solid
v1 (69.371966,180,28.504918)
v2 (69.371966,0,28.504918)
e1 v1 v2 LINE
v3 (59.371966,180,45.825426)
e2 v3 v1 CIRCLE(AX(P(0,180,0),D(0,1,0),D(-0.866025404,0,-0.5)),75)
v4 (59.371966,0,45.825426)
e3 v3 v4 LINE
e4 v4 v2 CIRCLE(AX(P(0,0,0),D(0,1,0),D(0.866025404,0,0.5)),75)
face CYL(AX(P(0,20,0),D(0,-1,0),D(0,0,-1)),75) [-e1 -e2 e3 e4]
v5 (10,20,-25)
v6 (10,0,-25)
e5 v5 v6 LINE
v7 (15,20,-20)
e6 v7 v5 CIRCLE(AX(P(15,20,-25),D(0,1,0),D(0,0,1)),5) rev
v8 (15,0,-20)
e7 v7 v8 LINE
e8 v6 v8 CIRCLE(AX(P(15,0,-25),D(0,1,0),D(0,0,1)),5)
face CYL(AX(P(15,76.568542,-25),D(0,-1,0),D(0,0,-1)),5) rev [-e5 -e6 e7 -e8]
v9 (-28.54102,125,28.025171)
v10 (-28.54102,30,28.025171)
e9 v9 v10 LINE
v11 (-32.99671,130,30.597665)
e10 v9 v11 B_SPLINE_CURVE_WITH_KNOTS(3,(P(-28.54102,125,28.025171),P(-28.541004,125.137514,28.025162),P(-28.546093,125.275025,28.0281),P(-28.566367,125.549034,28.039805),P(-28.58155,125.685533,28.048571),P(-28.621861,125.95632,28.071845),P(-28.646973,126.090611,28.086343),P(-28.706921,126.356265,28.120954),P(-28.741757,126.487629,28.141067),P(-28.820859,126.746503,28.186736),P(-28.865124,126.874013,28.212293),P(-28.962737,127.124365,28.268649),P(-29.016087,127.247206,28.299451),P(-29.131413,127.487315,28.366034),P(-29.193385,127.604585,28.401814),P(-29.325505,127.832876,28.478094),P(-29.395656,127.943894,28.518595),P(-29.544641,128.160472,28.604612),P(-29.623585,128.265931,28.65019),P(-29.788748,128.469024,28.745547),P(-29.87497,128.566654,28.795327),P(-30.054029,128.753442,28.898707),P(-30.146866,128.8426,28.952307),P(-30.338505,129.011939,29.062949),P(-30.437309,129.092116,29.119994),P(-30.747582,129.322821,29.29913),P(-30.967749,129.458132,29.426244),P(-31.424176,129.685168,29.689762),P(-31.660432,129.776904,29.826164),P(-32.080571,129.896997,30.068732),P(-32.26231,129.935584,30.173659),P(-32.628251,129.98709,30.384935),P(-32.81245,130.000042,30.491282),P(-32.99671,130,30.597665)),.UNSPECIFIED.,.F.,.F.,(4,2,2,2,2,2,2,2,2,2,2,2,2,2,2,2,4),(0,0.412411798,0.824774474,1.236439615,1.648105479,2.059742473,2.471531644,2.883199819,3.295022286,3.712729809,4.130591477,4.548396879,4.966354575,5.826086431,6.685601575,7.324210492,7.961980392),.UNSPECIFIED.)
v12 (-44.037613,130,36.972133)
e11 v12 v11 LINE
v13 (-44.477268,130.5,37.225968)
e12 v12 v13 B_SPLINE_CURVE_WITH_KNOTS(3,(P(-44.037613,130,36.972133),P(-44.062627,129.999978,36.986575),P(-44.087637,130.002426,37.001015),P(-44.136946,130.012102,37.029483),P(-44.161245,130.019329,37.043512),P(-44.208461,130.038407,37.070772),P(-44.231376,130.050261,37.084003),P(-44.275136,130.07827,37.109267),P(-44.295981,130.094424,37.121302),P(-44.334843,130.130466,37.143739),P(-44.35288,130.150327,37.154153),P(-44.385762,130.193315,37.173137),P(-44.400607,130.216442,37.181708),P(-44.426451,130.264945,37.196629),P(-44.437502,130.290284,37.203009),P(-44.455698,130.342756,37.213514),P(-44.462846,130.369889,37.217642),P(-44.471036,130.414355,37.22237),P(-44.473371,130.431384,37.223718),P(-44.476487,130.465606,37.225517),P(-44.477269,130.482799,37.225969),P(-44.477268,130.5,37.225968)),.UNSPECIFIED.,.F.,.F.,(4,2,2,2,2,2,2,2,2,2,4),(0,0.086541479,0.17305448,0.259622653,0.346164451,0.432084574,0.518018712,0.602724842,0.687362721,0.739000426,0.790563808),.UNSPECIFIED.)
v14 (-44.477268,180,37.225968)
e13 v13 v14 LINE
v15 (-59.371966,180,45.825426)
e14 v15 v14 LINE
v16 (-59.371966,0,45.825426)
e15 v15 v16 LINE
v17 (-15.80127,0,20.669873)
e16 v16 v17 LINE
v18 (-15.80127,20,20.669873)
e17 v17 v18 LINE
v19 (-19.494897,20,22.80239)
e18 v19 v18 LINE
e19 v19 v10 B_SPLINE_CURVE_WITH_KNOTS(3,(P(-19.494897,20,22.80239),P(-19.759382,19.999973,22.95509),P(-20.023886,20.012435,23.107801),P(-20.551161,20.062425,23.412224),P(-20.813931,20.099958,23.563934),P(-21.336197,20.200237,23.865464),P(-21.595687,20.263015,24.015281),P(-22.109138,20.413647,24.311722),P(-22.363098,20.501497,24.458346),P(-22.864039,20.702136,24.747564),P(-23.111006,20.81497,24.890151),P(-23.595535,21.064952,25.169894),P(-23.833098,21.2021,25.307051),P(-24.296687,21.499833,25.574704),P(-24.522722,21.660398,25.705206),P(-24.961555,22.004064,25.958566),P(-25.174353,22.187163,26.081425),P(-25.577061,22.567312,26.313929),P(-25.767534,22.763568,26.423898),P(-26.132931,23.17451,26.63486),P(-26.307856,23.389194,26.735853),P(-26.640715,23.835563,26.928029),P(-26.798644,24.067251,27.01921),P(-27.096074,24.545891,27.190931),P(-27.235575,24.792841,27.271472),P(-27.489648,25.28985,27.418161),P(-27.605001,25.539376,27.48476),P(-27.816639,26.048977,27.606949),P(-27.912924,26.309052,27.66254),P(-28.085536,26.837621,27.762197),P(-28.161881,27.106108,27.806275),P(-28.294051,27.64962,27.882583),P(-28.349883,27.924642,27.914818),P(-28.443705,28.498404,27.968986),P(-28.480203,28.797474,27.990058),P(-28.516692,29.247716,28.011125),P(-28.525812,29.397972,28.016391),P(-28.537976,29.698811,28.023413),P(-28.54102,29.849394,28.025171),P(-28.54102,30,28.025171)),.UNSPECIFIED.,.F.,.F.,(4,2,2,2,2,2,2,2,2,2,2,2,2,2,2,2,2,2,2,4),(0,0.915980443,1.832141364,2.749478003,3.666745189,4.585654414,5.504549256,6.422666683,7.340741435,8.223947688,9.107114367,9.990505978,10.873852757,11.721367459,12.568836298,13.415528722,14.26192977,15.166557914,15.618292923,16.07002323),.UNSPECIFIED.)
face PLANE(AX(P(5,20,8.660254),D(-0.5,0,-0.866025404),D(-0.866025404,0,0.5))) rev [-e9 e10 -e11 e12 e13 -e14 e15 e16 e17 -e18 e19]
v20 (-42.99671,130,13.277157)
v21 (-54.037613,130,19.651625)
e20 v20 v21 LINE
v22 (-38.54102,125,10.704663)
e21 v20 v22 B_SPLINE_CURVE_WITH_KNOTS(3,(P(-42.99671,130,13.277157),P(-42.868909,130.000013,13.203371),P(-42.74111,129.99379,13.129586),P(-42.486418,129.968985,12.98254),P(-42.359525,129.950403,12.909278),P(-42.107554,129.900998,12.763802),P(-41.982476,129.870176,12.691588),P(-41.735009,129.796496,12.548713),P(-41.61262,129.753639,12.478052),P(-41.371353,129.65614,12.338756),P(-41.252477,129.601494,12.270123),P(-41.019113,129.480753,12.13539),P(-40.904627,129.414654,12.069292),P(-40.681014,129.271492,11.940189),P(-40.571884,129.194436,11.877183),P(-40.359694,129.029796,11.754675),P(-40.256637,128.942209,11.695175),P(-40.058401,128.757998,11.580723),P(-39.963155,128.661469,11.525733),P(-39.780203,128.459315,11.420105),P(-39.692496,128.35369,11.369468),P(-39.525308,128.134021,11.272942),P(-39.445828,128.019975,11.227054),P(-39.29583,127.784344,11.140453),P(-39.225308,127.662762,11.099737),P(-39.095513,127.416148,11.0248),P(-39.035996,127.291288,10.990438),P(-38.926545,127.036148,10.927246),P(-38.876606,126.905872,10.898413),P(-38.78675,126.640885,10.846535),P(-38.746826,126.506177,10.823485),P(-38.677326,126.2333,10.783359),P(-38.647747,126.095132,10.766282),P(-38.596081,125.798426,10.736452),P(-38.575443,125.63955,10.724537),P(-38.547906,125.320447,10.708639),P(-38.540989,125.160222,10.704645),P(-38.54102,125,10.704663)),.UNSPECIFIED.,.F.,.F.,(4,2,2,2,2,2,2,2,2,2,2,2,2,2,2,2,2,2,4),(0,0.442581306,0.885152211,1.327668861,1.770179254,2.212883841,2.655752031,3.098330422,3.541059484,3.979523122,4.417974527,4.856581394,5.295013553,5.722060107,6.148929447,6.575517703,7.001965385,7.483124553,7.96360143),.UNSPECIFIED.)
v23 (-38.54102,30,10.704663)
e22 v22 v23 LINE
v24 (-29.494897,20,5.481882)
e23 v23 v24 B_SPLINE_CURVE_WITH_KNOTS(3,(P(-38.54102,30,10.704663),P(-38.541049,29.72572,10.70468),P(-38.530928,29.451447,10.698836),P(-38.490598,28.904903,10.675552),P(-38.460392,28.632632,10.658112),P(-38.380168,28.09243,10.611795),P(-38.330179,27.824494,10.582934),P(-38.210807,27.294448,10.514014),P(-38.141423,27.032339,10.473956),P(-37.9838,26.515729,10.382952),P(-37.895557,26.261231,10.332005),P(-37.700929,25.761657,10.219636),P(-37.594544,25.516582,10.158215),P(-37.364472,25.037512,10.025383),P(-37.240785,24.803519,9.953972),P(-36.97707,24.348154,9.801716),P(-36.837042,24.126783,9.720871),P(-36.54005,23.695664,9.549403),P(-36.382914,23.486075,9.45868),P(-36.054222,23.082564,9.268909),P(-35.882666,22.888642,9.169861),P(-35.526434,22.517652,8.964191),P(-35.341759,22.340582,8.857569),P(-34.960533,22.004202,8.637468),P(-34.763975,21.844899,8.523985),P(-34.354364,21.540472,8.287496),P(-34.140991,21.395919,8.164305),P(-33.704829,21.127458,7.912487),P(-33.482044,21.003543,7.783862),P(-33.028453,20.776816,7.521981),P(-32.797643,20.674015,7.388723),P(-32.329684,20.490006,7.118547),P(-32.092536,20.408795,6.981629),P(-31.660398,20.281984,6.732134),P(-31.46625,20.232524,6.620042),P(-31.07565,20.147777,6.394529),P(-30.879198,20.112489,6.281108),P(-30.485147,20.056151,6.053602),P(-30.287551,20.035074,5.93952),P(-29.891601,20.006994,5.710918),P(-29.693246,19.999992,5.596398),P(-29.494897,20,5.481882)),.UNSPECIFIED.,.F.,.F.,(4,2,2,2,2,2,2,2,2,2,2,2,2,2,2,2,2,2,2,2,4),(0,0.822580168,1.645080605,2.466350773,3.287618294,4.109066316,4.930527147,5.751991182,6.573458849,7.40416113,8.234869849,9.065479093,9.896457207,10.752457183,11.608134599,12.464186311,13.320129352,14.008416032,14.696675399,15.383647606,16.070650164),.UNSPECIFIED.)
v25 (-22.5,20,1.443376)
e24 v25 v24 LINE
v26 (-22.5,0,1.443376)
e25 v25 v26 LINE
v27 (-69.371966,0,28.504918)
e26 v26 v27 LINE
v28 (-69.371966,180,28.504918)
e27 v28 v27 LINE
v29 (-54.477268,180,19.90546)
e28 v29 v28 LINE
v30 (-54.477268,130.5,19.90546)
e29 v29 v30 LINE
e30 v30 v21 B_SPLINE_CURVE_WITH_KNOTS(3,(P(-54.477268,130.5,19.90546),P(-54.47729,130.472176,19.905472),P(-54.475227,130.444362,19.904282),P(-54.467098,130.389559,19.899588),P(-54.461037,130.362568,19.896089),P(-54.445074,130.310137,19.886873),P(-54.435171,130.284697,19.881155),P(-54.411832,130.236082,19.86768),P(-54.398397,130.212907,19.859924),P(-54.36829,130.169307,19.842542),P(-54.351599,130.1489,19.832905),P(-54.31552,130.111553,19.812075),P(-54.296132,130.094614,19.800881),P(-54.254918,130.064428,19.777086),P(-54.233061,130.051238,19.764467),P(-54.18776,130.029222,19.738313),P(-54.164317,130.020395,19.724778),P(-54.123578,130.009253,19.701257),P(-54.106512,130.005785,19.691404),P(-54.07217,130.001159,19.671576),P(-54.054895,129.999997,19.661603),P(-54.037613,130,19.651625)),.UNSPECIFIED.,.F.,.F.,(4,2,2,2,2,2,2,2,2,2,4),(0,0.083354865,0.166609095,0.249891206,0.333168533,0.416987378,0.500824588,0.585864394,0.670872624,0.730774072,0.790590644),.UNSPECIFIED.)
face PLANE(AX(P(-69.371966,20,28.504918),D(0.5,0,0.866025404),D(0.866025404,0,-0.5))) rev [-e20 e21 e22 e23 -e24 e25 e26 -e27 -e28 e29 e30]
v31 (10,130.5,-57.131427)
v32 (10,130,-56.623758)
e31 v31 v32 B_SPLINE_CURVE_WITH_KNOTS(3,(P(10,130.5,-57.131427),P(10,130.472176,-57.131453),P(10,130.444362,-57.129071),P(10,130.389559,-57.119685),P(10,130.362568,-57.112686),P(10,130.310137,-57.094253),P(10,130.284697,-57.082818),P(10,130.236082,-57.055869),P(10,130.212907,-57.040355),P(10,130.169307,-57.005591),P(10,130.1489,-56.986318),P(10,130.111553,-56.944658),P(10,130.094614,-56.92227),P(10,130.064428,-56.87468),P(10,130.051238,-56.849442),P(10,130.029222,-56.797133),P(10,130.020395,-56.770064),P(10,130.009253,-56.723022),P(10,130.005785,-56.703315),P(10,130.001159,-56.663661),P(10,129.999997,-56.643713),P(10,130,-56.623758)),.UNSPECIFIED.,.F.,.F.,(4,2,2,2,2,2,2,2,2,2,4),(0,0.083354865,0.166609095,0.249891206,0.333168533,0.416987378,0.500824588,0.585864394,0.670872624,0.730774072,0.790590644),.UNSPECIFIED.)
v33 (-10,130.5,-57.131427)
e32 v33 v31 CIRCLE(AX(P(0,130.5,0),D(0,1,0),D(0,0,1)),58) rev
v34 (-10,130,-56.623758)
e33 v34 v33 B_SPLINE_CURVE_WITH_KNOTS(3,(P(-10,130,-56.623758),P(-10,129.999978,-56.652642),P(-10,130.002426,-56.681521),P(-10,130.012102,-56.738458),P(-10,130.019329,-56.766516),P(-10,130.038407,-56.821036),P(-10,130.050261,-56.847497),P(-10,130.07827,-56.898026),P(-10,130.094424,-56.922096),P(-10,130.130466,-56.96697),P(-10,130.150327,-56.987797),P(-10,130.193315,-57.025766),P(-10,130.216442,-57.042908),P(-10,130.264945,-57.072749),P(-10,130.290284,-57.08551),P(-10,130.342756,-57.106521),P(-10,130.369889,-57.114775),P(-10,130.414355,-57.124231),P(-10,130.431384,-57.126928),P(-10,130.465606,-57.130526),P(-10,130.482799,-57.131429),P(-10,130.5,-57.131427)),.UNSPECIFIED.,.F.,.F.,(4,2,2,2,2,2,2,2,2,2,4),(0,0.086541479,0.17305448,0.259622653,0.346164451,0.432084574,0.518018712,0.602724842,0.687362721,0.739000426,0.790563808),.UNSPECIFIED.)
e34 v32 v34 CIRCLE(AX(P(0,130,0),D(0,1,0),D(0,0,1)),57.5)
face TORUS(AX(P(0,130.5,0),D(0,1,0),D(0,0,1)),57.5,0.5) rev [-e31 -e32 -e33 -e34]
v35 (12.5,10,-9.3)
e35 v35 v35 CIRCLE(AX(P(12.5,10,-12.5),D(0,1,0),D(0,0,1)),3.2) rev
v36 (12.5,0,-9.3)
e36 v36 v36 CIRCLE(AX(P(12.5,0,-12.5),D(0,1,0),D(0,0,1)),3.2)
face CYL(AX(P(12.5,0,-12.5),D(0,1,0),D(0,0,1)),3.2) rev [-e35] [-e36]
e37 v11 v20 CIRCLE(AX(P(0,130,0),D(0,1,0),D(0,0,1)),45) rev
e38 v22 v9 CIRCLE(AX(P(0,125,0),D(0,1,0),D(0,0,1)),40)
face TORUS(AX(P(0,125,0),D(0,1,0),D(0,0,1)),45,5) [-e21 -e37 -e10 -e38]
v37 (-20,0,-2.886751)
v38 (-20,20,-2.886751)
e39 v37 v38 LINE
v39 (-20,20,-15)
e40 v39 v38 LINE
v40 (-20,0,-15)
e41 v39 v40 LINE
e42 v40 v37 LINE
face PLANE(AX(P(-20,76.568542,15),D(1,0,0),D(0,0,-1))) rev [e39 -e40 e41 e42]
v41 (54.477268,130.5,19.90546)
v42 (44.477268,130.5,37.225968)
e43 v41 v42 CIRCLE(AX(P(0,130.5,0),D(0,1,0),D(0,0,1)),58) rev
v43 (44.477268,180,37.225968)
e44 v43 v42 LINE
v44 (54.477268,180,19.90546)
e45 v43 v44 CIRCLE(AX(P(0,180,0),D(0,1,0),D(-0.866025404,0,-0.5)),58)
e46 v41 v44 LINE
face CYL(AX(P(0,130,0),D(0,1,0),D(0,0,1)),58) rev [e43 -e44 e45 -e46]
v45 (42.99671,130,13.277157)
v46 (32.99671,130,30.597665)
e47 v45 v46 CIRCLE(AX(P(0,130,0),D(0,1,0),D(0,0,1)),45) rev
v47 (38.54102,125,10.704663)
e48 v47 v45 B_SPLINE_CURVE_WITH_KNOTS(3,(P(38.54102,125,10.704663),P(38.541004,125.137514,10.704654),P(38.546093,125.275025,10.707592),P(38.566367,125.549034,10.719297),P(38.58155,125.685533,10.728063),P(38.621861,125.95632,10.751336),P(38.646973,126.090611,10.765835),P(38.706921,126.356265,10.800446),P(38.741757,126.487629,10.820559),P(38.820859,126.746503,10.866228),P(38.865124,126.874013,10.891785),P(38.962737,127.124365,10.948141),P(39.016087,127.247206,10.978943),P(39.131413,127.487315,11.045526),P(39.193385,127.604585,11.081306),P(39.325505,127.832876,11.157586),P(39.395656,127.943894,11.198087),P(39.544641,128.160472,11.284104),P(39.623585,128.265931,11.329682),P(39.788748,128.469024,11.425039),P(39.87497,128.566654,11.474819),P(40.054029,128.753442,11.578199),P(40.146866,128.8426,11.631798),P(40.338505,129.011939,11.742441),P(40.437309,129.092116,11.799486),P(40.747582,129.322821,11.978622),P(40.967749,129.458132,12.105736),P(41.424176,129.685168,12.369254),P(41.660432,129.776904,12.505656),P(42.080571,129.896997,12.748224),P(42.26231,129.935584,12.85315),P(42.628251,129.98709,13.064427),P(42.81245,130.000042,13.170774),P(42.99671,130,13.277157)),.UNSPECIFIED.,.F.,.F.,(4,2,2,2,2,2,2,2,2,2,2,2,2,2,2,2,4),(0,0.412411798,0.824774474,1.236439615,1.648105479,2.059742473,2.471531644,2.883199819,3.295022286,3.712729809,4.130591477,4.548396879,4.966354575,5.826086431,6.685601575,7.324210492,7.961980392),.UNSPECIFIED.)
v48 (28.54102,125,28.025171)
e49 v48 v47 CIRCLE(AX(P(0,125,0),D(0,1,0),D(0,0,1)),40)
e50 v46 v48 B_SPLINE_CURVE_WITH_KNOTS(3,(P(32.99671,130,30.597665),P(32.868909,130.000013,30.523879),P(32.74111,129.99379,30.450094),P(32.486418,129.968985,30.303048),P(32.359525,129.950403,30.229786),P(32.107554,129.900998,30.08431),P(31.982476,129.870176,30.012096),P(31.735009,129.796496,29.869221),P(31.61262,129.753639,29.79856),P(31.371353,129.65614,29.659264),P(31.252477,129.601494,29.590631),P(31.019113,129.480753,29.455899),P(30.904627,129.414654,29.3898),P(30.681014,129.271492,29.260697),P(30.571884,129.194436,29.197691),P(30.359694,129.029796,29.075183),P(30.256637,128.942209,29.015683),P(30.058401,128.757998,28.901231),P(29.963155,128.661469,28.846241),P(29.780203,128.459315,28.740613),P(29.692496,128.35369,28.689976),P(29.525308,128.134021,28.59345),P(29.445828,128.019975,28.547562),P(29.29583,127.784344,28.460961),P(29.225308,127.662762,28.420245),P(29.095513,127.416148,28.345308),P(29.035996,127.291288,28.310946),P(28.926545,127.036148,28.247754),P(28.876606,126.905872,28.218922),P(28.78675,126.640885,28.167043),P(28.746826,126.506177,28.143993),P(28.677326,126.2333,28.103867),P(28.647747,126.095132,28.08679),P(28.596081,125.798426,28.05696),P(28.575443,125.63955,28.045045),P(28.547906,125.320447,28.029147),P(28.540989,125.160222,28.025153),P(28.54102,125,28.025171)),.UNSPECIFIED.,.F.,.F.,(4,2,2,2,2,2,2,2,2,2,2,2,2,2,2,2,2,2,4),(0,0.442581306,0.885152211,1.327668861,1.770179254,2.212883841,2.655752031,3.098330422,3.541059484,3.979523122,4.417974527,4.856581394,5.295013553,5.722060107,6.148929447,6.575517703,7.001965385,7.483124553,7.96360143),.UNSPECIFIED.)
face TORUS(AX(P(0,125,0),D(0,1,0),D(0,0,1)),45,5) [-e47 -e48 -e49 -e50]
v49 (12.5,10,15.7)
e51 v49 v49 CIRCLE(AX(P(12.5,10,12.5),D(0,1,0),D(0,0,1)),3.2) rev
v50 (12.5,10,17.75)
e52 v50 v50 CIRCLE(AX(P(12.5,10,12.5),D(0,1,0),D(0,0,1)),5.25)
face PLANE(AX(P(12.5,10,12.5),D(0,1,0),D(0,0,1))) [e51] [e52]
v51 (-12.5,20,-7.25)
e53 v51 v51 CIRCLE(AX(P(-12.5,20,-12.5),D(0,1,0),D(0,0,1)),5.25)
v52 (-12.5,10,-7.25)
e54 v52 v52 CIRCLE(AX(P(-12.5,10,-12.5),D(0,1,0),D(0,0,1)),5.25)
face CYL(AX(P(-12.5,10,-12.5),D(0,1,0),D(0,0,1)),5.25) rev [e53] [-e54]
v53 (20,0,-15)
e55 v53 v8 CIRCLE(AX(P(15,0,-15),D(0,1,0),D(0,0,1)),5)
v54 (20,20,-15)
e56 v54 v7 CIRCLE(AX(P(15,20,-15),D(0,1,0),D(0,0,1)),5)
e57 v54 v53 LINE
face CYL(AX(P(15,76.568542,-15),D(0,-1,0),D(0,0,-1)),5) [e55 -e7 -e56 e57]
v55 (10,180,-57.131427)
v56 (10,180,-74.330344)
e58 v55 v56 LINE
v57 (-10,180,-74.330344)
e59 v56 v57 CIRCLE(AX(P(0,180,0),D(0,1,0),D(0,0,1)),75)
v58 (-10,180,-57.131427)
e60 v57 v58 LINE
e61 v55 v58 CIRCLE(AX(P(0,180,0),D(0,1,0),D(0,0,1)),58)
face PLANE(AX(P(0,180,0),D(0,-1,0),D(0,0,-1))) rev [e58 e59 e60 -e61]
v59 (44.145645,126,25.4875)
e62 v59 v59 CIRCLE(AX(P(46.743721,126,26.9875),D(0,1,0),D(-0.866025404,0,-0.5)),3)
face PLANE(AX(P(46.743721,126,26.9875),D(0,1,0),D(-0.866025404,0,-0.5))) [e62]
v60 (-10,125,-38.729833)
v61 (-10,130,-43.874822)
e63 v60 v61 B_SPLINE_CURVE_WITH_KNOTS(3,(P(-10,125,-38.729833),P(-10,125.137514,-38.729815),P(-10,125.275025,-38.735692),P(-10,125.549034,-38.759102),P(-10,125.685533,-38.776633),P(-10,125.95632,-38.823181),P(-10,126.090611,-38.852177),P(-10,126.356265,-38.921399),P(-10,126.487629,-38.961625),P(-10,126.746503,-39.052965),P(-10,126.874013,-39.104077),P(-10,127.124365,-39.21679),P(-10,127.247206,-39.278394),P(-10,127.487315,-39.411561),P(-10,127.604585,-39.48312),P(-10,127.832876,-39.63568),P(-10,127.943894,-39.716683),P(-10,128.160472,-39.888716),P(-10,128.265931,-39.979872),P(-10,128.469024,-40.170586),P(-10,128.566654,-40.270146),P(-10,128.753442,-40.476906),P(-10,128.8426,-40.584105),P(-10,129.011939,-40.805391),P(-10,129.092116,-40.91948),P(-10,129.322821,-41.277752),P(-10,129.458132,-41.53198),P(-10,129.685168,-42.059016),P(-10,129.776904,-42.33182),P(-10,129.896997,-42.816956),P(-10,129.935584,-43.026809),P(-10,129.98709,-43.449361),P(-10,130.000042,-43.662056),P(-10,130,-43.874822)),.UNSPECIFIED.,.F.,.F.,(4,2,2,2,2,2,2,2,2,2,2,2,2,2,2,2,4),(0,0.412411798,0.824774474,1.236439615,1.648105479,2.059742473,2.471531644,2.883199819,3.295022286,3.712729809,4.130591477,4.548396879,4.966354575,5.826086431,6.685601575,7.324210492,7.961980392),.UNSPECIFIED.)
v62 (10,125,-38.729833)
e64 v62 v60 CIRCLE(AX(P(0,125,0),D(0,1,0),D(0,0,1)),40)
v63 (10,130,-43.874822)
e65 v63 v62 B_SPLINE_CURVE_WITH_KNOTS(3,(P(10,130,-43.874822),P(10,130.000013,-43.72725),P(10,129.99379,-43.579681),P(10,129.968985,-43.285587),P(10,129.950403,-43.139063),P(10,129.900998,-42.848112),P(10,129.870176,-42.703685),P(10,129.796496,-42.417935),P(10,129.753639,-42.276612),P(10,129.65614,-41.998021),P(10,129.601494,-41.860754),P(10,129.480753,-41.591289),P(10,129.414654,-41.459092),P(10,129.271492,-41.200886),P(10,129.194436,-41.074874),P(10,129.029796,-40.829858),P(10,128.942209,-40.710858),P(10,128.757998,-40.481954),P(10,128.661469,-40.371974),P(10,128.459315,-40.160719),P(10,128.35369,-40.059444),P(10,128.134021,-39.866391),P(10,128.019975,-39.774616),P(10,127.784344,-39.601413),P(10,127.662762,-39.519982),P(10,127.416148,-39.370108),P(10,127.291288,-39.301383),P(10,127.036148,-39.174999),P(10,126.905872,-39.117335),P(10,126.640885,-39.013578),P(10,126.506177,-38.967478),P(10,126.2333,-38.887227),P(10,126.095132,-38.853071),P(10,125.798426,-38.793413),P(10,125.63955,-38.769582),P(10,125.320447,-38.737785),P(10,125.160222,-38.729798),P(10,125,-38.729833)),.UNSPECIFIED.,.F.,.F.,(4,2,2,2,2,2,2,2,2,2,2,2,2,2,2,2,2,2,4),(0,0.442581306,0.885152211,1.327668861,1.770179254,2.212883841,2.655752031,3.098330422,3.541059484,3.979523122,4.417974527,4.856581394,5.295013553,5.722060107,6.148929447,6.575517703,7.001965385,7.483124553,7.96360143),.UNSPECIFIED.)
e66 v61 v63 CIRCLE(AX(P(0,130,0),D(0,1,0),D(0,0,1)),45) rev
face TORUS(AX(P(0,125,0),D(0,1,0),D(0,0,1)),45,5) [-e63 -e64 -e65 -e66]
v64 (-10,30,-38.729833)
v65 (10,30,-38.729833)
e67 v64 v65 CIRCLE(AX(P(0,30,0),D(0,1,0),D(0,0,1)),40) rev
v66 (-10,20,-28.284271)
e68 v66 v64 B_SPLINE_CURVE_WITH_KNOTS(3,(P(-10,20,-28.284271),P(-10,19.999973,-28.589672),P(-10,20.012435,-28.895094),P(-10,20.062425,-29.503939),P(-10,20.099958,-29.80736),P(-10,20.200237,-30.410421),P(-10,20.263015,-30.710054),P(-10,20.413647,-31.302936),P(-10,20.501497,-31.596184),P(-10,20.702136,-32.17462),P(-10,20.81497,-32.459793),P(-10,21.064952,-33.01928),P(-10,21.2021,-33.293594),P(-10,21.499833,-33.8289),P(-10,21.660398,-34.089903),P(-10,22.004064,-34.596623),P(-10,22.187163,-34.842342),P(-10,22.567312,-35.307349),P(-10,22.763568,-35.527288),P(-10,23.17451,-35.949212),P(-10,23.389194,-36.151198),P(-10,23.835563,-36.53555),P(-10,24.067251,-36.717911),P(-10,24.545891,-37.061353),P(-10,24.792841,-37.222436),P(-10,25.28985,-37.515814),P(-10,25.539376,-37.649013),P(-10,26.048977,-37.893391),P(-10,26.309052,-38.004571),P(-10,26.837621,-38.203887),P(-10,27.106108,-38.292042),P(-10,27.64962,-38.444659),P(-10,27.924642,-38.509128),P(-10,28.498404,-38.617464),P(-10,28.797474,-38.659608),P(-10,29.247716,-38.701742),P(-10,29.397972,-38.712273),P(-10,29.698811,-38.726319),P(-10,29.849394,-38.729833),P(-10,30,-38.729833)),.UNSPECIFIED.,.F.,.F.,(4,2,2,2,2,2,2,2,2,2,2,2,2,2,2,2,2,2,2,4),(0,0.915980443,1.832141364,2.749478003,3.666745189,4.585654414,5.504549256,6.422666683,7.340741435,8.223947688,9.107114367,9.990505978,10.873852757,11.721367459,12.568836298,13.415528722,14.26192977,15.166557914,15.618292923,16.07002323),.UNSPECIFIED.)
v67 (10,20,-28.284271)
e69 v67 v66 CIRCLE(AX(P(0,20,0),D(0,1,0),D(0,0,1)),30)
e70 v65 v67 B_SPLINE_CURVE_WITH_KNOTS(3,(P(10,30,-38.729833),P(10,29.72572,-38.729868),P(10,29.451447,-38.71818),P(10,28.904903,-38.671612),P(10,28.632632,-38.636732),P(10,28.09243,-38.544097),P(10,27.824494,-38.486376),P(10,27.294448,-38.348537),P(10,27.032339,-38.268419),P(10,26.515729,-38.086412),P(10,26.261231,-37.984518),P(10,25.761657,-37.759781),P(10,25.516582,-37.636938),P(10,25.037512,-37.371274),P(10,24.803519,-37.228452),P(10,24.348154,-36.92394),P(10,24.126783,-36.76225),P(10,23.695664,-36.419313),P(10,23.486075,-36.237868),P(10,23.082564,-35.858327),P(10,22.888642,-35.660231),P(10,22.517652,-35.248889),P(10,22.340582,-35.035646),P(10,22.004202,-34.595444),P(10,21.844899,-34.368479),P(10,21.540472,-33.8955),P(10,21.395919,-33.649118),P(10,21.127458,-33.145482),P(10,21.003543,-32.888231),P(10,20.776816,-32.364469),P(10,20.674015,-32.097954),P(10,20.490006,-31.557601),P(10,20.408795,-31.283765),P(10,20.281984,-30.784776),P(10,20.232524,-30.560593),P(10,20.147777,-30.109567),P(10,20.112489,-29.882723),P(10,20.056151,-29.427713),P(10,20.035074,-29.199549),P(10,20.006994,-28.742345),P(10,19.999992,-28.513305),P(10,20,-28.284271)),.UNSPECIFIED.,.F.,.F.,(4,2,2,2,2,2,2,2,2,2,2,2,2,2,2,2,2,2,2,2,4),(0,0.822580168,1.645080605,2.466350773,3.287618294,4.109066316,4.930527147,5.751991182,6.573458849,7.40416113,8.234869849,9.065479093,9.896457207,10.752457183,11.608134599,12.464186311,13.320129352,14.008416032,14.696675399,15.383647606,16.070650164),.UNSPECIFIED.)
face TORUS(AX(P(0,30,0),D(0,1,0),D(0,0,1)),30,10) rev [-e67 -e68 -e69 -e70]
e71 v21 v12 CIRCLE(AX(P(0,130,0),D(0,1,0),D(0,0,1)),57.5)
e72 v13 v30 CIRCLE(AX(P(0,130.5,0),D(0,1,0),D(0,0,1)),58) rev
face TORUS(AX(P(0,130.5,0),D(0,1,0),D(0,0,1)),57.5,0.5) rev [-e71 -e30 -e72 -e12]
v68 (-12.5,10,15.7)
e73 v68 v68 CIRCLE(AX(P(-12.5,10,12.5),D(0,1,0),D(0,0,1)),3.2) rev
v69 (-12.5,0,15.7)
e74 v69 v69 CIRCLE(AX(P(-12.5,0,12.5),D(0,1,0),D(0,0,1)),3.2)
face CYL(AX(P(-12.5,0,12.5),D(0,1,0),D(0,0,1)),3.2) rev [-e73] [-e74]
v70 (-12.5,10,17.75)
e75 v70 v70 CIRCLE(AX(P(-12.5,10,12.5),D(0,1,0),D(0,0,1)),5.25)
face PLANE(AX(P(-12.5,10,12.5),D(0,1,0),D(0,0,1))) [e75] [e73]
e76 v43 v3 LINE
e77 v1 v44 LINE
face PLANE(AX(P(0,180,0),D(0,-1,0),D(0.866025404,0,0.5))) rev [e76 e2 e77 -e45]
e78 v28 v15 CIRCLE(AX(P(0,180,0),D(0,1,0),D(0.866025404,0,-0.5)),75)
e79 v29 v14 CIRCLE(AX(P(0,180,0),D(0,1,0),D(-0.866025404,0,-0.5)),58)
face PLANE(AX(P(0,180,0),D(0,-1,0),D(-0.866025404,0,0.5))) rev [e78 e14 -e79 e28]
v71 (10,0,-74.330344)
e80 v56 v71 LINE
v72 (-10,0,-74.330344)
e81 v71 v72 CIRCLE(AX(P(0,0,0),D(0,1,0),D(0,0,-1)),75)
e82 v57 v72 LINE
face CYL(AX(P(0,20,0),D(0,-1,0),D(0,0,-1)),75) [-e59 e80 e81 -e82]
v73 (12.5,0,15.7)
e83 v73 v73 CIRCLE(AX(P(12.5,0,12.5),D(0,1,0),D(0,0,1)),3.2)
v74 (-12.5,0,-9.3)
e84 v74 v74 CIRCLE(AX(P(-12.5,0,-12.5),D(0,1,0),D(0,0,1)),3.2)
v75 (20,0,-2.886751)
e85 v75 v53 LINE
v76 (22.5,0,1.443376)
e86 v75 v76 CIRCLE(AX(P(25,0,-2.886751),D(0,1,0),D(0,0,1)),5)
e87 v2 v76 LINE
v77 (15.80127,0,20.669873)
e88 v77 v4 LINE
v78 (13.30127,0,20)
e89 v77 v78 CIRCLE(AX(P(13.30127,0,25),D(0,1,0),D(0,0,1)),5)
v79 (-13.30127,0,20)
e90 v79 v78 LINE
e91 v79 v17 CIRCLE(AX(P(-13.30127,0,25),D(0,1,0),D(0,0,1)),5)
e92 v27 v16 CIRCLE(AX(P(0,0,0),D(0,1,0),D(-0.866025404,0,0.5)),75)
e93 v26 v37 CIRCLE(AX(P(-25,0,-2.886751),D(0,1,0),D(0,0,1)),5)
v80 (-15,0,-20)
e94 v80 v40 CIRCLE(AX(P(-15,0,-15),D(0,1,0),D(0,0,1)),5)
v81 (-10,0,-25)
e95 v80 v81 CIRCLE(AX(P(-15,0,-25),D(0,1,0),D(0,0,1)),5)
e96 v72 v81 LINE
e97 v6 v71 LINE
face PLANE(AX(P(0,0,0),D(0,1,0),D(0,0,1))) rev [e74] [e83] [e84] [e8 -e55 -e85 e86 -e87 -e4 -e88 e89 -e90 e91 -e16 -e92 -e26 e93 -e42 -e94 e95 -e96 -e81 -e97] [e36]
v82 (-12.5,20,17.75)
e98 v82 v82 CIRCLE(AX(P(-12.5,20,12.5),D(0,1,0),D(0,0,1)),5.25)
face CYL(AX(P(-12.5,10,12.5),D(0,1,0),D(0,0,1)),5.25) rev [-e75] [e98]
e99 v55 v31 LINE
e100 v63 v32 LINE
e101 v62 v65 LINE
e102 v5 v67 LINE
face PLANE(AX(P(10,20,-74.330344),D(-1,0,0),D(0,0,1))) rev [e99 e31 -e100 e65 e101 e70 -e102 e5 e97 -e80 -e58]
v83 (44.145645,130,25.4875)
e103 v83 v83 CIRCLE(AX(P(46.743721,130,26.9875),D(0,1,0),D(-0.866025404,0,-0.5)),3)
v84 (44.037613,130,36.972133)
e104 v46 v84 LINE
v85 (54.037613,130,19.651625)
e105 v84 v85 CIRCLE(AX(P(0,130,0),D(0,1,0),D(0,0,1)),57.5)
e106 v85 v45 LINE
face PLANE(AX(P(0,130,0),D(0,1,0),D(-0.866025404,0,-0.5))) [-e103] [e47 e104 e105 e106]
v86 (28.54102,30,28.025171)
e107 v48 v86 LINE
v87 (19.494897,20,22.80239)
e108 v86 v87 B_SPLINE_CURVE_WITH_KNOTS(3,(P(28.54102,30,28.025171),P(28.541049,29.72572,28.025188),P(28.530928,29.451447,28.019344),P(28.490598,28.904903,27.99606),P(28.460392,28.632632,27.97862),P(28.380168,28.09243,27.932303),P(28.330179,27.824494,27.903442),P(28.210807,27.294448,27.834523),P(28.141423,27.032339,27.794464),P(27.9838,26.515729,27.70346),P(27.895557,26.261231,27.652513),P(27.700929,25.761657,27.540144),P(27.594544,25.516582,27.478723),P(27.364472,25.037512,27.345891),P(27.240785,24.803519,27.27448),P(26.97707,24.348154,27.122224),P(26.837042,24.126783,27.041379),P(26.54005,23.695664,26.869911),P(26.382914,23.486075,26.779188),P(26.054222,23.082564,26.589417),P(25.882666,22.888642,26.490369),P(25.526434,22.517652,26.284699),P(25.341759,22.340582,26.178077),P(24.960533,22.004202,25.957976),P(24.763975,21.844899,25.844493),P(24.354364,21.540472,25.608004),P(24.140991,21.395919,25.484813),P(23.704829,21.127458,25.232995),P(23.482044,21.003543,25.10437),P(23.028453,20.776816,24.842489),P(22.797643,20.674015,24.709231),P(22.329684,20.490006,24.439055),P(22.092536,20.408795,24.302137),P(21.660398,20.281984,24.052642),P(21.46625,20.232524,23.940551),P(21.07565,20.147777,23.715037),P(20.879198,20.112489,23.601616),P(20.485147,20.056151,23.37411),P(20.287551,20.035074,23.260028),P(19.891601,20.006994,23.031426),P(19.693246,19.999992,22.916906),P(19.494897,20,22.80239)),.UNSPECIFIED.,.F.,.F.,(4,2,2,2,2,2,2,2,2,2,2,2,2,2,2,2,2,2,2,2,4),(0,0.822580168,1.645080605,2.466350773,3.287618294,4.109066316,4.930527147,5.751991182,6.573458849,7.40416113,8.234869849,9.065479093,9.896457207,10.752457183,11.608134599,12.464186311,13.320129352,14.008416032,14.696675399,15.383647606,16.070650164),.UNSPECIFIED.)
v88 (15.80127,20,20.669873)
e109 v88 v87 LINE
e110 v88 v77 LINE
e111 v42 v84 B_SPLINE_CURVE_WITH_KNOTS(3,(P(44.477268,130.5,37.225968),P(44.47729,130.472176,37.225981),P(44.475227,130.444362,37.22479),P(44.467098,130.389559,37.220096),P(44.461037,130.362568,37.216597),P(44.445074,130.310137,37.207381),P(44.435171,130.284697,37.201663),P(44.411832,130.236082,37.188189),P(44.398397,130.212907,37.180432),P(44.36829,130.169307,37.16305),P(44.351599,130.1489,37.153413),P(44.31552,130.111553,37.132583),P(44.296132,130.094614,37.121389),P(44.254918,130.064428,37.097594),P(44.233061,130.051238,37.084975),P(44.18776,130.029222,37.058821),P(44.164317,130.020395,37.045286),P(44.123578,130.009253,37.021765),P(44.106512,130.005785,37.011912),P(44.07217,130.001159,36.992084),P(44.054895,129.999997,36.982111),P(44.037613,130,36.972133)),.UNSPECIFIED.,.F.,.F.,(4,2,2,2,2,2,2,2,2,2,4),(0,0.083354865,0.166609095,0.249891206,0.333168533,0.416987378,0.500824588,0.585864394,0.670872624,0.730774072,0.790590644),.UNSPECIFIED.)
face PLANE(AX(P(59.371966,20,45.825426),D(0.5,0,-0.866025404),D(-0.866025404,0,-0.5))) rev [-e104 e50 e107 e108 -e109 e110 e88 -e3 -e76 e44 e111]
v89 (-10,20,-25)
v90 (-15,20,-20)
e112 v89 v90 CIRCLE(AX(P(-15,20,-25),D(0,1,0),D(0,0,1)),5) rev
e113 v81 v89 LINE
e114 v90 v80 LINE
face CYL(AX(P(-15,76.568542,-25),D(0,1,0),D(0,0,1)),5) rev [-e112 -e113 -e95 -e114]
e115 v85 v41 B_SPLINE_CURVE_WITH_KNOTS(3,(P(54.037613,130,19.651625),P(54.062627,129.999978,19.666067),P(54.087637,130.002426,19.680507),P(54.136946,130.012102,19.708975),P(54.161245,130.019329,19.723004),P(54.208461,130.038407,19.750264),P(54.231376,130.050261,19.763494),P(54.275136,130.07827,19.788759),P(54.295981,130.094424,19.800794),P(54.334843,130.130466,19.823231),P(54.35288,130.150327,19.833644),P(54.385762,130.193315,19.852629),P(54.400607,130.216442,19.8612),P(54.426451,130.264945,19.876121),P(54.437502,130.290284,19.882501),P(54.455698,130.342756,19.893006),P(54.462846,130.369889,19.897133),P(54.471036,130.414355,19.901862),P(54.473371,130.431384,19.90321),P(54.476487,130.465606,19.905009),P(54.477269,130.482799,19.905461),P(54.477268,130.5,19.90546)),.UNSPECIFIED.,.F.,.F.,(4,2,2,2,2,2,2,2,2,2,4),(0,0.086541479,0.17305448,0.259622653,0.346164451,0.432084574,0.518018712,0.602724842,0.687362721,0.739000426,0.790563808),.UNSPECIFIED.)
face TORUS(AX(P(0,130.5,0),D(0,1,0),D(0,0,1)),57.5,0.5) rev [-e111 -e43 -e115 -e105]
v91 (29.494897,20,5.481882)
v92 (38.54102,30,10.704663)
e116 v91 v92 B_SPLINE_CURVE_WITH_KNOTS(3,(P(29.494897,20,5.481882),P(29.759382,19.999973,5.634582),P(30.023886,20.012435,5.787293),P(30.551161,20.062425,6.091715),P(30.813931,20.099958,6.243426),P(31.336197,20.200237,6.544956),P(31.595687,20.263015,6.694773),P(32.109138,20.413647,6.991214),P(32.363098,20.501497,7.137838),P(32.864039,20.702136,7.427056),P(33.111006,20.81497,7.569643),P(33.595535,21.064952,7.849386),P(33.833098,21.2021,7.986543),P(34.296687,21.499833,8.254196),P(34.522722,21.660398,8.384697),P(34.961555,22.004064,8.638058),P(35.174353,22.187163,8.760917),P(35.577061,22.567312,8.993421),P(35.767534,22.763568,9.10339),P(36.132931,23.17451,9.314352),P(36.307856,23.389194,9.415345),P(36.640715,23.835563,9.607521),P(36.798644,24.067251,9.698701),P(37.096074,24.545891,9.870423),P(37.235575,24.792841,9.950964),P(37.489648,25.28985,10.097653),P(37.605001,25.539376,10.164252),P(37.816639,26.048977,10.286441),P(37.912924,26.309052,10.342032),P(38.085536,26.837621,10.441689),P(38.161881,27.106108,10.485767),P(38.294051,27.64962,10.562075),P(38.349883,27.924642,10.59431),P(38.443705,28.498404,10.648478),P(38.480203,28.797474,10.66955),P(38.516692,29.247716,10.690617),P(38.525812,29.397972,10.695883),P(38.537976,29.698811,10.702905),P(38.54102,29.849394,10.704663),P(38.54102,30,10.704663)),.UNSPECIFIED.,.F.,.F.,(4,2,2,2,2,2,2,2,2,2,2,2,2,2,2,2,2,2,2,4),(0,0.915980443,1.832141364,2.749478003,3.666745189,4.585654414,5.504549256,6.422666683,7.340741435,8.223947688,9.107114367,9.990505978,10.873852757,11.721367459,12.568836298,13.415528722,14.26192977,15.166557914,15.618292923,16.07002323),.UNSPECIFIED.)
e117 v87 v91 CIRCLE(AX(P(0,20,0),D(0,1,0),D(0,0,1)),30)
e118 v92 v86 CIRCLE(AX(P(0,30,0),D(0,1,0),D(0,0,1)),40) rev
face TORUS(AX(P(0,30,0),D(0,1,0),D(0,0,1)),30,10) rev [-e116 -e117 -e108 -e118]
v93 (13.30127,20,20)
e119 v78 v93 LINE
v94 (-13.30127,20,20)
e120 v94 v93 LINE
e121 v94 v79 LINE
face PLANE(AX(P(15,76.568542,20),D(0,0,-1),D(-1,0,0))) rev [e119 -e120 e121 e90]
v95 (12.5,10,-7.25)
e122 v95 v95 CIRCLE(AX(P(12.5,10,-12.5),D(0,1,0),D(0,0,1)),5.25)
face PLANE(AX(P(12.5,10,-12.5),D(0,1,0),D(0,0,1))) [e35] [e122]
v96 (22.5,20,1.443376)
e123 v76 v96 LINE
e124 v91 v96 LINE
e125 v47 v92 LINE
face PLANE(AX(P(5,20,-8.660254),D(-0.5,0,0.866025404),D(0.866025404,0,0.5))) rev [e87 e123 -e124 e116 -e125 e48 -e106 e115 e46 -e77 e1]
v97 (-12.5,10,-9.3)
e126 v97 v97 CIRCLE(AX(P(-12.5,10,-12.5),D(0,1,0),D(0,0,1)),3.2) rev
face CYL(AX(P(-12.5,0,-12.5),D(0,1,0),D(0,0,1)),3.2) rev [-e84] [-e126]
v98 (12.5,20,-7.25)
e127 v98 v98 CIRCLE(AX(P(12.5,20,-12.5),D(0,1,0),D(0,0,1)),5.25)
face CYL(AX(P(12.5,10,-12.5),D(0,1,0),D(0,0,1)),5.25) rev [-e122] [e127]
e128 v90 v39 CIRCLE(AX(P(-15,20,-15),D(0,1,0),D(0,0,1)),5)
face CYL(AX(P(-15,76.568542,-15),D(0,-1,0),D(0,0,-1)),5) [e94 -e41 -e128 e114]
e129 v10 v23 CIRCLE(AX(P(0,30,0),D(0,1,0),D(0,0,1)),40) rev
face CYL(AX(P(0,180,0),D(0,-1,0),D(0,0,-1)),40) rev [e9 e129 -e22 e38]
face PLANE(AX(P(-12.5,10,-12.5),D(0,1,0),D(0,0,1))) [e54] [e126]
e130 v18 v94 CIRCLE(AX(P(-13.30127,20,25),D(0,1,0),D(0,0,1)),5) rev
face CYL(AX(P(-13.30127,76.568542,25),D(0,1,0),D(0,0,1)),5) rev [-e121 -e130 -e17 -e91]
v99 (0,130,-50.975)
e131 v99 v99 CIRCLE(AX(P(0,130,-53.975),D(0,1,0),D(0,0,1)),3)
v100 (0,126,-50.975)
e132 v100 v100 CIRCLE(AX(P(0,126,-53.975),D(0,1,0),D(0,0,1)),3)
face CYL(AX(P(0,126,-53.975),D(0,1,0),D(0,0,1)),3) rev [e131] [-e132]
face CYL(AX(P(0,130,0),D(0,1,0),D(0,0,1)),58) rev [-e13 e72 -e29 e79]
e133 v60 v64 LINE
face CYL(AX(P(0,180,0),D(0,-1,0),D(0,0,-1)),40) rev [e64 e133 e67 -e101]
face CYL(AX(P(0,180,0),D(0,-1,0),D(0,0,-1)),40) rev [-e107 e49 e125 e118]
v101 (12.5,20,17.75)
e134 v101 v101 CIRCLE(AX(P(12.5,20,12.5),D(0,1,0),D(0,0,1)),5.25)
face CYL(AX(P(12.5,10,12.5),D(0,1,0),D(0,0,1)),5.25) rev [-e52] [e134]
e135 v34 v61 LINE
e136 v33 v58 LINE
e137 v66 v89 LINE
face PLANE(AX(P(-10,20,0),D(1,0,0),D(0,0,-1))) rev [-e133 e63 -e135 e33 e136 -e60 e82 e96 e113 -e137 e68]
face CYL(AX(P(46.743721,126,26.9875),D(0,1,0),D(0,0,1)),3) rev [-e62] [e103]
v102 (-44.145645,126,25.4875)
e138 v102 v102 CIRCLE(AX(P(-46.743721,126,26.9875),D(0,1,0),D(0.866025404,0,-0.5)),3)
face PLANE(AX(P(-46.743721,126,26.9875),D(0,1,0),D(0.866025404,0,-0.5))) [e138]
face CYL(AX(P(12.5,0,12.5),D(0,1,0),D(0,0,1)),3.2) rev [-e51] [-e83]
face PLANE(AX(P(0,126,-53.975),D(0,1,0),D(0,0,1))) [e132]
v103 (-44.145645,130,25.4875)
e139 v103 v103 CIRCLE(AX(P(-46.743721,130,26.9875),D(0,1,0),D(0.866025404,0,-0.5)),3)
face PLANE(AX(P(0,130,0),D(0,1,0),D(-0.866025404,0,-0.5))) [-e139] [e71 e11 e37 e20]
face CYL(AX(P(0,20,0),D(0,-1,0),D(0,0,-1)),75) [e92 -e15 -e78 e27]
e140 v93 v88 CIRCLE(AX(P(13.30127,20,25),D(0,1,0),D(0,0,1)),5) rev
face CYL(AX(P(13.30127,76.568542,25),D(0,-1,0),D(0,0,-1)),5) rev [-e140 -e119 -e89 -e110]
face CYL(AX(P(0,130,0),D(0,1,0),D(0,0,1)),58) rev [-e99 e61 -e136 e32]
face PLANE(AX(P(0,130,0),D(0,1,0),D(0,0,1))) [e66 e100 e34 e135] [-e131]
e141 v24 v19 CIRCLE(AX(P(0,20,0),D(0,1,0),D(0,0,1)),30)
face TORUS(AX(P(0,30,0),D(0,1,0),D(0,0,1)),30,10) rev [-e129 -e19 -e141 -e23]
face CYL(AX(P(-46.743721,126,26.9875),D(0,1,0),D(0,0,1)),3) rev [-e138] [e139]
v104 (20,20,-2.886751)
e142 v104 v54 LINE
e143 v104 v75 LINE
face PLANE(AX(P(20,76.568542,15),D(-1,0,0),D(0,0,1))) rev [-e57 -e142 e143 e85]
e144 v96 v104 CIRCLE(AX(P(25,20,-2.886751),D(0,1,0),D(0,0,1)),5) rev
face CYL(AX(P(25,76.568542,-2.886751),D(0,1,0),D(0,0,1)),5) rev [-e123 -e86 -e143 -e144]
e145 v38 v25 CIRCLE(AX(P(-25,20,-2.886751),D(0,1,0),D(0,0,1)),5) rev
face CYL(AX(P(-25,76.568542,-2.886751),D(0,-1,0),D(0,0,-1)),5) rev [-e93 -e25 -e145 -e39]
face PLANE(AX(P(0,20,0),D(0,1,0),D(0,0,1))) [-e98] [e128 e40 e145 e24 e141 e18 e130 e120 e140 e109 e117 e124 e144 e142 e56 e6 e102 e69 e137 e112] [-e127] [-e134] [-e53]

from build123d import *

# Parameters (mm, degrees)
BOSS_EXTRUDE1_DEPTH = 20
BOSS_EXTRUDE2_DEPTH = 160
SKETCH3_R           = 58
CUT_EXTRUDE1_DEPTH  = 50
SKETCH4_R           = 3
CUT_EXTRUDE2_DEPTH  = 4
CIRPATTERN1_COUNT   = 3
BOSS_EXTRUDE3_DEPTH = 20
SKETCH5_R           = 3.2
CUT_EXTRUDE3_DEPTH  = 190.835375153
FILLET1_R           = 10
FILLET2_R           = 5
FILLET4_R           = 0.5
SKETCH7_R           = 5.25
CUT_EXTRUDE4_DEPTH  = 10


with BuildPart() as part:
    # Sketch1 → Boss-Extrude1 (new body)
    with BuildSketch(Plane(origin=(0, 0, 0), x_dir=(1, 0, 0), z_dir=(0, 1, 0))):
        with BuildLine():
            Line((-10, 0), (-10, 74.330343737))
            ThreePointArc((-10, 74.330343737), (0, 75), (10, 74.330343737))
            Line((10, 74.330343737), (10, 0))
            ThreePointArc((10, 0), (0, -10), (-10, 0))
        make_face()
    boss_extrude1 = extrude(amount=BOSS_EXTRUDE1_DEPTH)

    # Sketch2 → Boss-Extrude2 (add)
    with BuildSketch(Plane(origin=(0, 20, 0), x_dir=(1, 0, 0), z_dir=(0, 1, 0))):
        with BuildLine():
            Line((-10, 74.330343737), (-10, 38.729833462))
            ThreePointArc((-10, 38.729833462), (0, 40), (10, 38.729833462))
            Line((10, 38.729833462), (10, 74.330343737))
            ThreePointArc((10, 74.330343737), (0, 75), (-10, 74.330343737))
        make_face()
    boss_extrude2 = extrude(amount=BOSS_EXTRUDE2_DEPTH)

    # Sketch3 → Cut-Extrude1 (cut)
    with BuildSketch(Plane(origin=(0, 180, 0), x_dir=(1, 0, 0), z_dir=(0, 1, 0))):
        Circle(SKETCH3_R)
    cut_extrude1 = extrude(amount=-CUT_EXTRUDE1_DEPTH, mode=Mode.SUBTRACT)

    # Sketch4 → Cut-Extrude2 (cut)
    with BuildSketch(Plane(origin=(0, 130, 0), x_dir=(1, 0, 0), z_dir=(0, 1, 0))):
        with Locations(Location((0, 53.975, 0), (0, 0, 270))):
            Circle(SKETCH4_R)
    cut_extrude2 = extrude(amount=-CUT_EXTRUDE2_DEPTH, mode=Mode.SUBTRACT)

    # CirPattern1: Boss-Extrude1, Boss-Extrude2, Cut-Extrude1, Cut-Extrude2 ×3 about axis
    cirpattern1_axis = Axis((0, 0, 0), (0, 1, 0))
    add([boss_extrude1.rotate(cirpattern1_axis, i * 360 / CIRPATTERN1_COUNT) for i in range(1, CIRPATTERN1_COUNT)])
    add([boss_extrude2.rotate(cirpattern1_axis, i * 360 / CIRPATTERN1_COUNT) for i in range(1, CIRPATTERN1_COUNT)])
    add([cut_extrude1.rotate(cirpattern1_axis, i * 360 / CIRPATTERN1_COUNT) for i in range(1, CIRPATTERN1_COUNT)], mode=Mode.SUBTRACT)
    add([cut_extrude2.rotate(cirpattern1_axis, i * 360 / CIRPATTERN1_COUNT) for i in range(1, CIRPATTERN1_COUNT)], mode=Mode.SUBTRACT)

    # Sketch6 → Boss-Extrude3 (add)
    with BuildSketch(Plane(origin=(0, 0, 0), x_dir=(1, 0, 0), z_dir=(0, 1, 0))):
        with BuildLine():
            Line((15, -20), (-15, -20))
            ThreePointArc((-15, -20), (-18.535533906, -18.535533906), (-20, -15))
            Line((-20, -15), (-20, 15))
            ThreePointArc((-20, 15), (-18.535533906, 18.535533906), (-15, 20))
            Line((-15, 20), (15, 20))
            ThreePointArc((15, 20), (18.535533906, 18.535533906), (20, 15))
            Line((20, 15), (20, -15))
            ThreePointArc((20, -15), (18.535533906, -18.535533906), (15, -20))
        make_face()
    extrude(amount=BOSS_EXTRUDE3_DEPTH)

    # Sketch5 → Cut-Extrude3 (cut, through all)
    with BuildSketch(Plane(origin=(0, 20, 0), x_dir=(1, 0, 0), z_dir=(0, 1, 0))):
        with Locations(Location((-12.5, 12.5, 0), (0, 0, 270))):
            Circle(SKETCH5_R)
        with Locations(Location((12.5, 12.5, 0), (0, 0, 270))):
            Circle(SKETCH5_R)
        with Locations(Location((-12.5, -12.5, 0), (0, 0, 270))):
            Circle(SKETCH5_R)
        with Locations(Location((12.5, -12.5, 0), (0, 0, 270))):
            Circle(SKETCH5_R)
    extrude(amount=-CUT_EXTRUDE3_DEPTH, mode=Mode.SUBTRACT)

    # Fillet1
    fillet1_edges = [part.edges().sort_by_distance(p)[0] for p in [
        (0, 20, -40),
        (34.641016151, 20, 20),
        (-34.641016151, 20, 20),
    ]]
    fillet(fillet1_edges, radius=FILLET1_R)

    # Fillet2
    fillet2_edges = [part.edges().sort_by_distance(p)[0] for p in [
        (34.641016151, 130, 20),
        (-14.641016151, 10, 20),
        (-20, 10, 0),
        (20, 10, 0),
        (10, 10, -20),
        (-10, 10, -20),
        (14.641016151, 10, 20),
        (0, 130, -40),
        (-34.641016151, 130, 20),
    ]]
    fillet(fillet2_edges, radius=FILLET2_R - 0.0001)  # a hair under: the kernel refuses the full size

    # Fillet4
    fillet4_edges = [part.edges().sort_by_distance(p)[0] for p in [
        (50.229473419, 130, 29),
        (-50.229473419, 130, 29),
        (0, 130, -58),
    ]]
    fillet(fillet4_edges, radius=FILLET4_R)

    # Sketch7 → Cut-Extrude4 (cut)
    with BuildSketch(Plane(origin=(0, 20, 0), x_dir=(1, 0, 0), z_dir=(0, 1, 0))):
        with Locations(Location((-12.5, 12.5, 0), (0, 0, 270))):
            Circle(SKETCH7_R)
        with Locations(Location((12.5, 12.5, 0), (0, 0, 270))):
            Circle(SKETCH7_R)
        with Locations(Location((12.5, -12.5, 0), (0, 0, 270))):
            Circle(SKETCH7_R)
        with Locations(Location((-12.5, -12.5, 0), (0, 0, 270))):
            Circle(SKETCH7_R)
    extrude(amount=-CUT_EXTRUDE4_DEPTH, mode=Mode.SUBTRACT)


solid = part.part
